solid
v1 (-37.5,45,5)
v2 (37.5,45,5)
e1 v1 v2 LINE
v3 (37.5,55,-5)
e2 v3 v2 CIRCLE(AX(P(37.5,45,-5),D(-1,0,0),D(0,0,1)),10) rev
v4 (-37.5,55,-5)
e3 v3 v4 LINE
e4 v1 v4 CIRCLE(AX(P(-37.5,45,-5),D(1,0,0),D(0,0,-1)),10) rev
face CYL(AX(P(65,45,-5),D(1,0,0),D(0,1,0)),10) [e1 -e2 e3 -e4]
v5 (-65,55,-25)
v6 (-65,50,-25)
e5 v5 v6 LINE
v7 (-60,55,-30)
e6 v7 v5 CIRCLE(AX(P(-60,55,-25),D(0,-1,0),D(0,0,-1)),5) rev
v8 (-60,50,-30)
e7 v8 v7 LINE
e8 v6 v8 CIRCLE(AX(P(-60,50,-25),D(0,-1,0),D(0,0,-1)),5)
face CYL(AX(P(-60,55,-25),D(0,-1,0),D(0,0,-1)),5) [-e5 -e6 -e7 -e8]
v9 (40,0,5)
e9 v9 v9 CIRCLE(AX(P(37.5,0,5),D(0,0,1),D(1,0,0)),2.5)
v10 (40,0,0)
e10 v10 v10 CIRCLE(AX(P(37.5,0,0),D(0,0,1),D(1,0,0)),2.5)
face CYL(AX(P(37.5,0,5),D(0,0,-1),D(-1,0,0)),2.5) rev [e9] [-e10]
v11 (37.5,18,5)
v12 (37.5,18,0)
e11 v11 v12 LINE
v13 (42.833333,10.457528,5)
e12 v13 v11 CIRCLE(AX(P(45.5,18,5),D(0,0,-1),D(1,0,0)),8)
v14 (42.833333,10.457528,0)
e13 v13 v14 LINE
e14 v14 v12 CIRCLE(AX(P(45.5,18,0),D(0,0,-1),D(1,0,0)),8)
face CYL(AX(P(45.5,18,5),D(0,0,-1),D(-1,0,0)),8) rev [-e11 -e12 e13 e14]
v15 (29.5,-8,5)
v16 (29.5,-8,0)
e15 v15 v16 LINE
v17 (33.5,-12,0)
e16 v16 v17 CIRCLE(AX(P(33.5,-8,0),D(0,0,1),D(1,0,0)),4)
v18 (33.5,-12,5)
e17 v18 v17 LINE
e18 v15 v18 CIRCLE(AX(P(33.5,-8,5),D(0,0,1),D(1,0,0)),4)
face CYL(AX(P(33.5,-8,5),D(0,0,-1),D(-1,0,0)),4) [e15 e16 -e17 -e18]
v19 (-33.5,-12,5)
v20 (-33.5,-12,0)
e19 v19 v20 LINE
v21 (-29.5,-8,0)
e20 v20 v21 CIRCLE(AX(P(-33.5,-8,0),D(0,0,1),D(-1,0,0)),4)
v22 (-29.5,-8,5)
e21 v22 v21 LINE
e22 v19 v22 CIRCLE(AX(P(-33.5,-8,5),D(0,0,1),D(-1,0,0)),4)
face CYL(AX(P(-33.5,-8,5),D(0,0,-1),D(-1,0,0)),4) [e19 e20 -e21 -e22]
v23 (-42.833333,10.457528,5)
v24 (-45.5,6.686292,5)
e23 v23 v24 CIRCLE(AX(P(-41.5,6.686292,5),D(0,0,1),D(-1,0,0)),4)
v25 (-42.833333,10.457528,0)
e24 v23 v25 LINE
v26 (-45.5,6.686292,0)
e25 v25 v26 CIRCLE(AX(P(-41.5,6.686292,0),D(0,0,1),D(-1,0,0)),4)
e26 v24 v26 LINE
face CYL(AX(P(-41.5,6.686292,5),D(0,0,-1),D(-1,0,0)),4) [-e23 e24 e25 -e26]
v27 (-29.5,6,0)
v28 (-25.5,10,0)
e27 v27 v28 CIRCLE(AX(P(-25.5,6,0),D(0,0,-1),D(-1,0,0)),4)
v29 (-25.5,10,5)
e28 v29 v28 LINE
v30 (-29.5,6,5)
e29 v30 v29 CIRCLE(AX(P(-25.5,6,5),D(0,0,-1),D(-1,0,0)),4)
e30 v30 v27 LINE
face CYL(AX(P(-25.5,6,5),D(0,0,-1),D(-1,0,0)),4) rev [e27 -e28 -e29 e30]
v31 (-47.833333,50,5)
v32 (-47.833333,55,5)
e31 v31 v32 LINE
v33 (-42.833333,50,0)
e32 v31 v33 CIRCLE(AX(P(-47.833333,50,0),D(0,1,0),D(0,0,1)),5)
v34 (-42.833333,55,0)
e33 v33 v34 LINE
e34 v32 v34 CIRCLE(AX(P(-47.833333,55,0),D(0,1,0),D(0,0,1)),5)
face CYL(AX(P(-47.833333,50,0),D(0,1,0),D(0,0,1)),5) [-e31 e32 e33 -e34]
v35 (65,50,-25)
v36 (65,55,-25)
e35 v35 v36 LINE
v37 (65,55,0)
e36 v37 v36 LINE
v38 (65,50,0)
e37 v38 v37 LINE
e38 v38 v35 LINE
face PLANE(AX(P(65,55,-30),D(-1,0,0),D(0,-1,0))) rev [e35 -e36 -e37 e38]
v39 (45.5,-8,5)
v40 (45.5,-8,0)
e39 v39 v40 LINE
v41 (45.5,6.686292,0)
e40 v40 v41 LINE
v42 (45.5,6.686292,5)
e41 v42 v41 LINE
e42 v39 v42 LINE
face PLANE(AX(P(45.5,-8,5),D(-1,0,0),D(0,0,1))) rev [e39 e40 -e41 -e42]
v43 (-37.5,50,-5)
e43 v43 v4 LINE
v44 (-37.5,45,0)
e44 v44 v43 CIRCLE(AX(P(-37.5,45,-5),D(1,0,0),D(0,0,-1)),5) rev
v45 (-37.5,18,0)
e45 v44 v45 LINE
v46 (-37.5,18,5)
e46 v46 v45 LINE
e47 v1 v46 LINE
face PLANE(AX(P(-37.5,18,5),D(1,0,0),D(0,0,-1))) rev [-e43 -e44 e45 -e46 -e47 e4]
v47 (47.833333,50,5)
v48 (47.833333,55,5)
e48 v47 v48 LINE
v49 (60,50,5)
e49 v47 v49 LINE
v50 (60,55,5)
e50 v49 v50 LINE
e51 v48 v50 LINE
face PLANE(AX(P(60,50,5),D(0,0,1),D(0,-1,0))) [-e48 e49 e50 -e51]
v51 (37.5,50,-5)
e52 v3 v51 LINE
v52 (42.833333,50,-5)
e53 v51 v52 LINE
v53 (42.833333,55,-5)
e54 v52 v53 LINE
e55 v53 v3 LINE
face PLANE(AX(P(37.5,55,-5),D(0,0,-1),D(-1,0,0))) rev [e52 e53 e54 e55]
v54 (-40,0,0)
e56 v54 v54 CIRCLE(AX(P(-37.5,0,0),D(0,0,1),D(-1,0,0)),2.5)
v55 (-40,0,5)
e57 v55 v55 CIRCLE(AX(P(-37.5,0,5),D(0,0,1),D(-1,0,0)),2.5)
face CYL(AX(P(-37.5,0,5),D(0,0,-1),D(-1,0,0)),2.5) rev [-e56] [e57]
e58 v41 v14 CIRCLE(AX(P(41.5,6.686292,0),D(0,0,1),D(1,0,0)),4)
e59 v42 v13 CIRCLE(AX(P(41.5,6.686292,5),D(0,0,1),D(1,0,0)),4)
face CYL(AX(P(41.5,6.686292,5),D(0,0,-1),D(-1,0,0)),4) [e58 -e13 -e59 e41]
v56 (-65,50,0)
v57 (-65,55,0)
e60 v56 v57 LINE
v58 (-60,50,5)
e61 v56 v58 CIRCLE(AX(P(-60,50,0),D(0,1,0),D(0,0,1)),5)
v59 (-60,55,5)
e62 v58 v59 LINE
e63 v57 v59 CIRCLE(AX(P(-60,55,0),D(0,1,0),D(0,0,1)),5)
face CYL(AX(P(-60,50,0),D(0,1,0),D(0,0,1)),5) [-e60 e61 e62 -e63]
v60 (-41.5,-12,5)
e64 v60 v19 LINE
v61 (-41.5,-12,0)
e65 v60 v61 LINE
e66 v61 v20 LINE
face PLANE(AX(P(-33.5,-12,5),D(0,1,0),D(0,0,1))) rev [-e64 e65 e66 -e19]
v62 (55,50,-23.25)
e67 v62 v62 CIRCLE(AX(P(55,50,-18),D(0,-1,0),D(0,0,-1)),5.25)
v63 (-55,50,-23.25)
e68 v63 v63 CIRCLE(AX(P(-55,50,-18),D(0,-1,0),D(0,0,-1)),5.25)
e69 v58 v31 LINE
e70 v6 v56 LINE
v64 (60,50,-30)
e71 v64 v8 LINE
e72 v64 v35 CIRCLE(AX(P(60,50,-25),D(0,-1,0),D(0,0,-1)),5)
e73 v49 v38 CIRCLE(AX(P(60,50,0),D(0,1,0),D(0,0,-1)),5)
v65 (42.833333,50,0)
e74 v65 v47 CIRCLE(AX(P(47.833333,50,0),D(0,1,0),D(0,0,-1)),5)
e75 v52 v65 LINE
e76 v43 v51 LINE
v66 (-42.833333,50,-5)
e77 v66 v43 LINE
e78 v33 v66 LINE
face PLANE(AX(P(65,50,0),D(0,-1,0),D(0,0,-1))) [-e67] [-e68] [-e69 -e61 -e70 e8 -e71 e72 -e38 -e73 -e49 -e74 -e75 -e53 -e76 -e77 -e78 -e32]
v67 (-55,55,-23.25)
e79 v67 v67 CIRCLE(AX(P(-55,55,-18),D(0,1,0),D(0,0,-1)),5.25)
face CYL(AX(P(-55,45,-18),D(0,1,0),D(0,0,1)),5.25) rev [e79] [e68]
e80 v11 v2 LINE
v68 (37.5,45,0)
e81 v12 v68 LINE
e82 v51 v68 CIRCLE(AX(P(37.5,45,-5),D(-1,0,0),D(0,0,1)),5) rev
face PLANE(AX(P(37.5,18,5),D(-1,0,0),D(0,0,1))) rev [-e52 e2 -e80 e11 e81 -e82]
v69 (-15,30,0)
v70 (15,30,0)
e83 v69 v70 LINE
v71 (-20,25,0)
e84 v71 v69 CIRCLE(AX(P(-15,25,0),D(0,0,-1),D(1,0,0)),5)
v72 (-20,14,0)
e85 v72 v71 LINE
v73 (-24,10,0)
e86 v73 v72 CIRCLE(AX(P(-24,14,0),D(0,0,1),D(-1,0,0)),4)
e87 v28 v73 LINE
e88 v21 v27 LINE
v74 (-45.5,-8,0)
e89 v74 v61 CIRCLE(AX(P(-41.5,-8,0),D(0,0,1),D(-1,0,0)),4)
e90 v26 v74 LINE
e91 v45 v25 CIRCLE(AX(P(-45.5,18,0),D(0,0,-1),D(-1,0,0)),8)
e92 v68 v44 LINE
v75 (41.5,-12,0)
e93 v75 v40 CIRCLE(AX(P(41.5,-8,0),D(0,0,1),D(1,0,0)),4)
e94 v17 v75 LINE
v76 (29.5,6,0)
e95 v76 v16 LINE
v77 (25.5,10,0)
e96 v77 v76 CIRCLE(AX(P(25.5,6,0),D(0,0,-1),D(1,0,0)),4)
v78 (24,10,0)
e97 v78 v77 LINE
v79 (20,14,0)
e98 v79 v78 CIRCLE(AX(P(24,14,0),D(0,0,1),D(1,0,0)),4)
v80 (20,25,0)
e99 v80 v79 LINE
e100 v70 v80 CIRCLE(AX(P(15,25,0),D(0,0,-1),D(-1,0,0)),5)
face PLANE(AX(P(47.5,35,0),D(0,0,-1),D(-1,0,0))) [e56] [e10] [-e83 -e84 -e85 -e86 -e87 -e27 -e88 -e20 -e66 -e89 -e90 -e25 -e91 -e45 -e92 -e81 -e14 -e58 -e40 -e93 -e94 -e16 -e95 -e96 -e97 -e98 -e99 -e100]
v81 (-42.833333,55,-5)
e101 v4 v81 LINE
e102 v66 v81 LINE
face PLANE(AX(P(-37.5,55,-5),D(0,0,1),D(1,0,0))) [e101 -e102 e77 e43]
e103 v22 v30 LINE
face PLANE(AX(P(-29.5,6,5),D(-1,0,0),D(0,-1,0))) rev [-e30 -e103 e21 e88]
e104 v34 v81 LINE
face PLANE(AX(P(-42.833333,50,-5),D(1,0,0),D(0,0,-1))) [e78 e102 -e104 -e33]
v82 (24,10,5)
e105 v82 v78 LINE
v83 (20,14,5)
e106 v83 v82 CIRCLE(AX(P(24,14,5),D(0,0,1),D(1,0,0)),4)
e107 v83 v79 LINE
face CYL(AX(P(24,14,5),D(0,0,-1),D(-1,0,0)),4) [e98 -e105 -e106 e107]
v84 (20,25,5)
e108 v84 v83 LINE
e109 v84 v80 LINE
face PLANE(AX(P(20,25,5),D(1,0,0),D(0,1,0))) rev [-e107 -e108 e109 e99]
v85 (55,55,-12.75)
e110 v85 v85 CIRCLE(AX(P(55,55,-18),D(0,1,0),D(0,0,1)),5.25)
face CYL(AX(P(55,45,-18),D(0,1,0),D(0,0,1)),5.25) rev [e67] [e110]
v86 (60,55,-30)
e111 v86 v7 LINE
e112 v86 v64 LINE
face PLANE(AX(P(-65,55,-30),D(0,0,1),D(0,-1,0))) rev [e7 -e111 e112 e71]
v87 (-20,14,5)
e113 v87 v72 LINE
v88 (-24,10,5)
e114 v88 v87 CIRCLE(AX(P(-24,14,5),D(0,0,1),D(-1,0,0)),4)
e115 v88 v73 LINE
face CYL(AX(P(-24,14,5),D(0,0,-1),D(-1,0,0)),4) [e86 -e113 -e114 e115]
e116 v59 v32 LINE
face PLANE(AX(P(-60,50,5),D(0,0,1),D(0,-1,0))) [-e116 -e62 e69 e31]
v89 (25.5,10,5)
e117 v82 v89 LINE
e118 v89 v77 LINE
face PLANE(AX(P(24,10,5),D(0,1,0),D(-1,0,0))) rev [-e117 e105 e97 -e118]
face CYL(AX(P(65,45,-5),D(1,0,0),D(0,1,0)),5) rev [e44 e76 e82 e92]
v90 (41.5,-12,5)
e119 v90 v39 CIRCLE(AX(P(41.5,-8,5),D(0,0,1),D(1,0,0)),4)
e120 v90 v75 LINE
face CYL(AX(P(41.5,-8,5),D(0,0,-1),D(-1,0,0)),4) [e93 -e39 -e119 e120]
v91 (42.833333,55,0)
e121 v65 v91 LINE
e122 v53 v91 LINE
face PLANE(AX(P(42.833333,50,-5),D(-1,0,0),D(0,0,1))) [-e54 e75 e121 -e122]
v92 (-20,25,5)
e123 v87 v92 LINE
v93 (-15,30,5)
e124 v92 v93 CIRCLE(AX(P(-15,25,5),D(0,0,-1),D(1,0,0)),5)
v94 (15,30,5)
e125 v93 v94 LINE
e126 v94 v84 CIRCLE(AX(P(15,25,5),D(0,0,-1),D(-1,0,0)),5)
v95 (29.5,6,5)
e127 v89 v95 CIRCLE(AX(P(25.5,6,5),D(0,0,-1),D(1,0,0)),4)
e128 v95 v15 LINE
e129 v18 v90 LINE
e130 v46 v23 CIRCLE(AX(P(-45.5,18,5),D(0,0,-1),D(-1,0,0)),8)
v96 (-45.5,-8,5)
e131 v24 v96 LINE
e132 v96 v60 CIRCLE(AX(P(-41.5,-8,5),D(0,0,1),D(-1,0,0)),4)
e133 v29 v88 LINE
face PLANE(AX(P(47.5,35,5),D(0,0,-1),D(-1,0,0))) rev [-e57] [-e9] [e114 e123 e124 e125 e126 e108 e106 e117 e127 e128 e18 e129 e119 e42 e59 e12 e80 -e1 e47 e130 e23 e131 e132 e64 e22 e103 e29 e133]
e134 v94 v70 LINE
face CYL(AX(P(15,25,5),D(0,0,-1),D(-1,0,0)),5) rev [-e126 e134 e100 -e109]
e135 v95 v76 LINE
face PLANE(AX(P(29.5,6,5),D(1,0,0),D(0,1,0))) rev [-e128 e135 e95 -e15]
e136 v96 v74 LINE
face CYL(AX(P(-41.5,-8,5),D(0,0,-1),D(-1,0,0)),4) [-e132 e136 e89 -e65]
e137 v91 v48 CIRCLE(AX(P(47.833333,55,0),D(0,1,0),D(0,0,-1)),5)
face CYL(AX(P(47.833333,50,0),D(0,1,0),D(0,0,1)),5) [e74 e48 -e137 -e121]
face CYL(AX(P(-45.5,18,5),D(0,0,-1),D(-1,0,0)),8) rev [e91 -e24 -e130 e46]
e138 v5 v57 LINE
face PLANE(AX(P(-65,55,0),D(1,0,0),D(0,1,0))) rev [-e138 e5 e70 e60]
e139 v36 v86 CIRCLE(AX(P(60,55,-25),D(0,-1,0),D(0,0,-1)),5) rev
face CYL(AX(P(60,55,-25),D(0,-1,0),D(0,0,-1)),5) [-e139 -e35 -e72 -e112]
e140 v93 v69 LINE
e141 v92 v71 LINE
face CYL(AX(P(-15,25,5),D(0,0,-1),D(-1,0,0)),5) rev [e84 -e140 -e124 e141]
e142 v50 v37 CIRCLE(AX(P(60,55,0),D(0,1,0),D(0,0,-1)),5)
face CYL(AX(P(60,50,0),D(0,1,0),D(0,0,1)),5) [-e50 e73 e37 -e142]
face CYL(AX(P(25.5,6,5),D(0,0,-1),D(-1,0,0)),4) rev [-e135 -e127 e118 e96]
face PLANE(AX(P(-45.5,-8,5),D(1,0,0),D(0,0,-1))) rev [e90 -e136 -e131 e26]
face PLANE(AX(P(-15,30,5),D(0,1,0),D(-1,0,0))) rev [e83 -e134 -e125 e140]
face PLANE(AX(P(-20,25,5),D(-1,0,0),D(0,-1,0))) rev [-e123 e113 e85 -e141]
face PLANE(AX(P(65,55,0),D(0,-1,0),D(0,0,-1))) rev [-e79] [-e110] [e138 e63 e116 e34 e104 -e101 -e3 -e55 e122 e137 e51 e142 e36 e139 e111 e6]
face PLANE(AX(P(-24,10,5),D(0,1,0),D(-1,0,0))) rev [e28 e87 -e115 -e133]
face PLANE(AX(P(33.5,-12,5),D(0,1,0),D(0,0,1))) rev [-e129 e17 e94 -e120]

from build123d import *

# Parameters (mm, degrees)
ESQUISSE1_R                           = 2.5
T_LE_DE_BASE_PLI_E1_DEPTH             = 5
T_LE_PLI_E_SUR_AR_TE1_STRIP_W         = 30
T_LE_PLI_E_SUR_AR_TE1_STRIP_H         = 5
T_LE_PLI_E_SUR_AR_TE1_STRIP_CUT_DEPTH = 130
T_LE_PLI_E_SUR_AR_TE1_DEPTH           = 130
CONG_1_R                              = 5
ESQUISSE7_R                           = 5.25
EXTRUSION2_DEPTH                      = 10
ESQUISSE8_W                           = 27.5
ESQUISSE8_H                           = 20
EXTRUSION3_DEPTH                      = 10
PATTE1_DEPTH                          = 5


# Sheet-metal steps are written as plain solids
with BuildPart() as part:
    # Esquisse1 → Tôle de base pliée1 (new body)
    with BuildSketch(Plane.XY):
        with BuildLine():
            Line((29.5, 6), (29.5, -8))
            ThreePointArc((29.5, -8), (30.671572875, -10.828427125), (33.5, -12))
            Line((33.5, -12), (41.5, -12))
            ThreePointArc((41.5, -12), (44.328427125, -10.828427125), (45.5, -8))
            Line((45.5, -8), (45.5, 6.686291501))
            ThreePointArc((45.5, 6.686291501), (44.765986324, 8.995692578), (42.833333333, 10.457527667))
            ThreePointArc((42.833333333, 10.457527667), (38.968027353, 13.381197846), (37.5, 18))
            Line((37.5, 18), (37.5, 35))
            ThreePointArc((37.5, 35), (40.428932188, 42.071067812), (47.5, 45))
            Line((47.5, 45), (65, 45))
            Line((65, 45), (65, 50))
            Line((65, 50), (-65, 50))
            Line((-65, 50), (-65, 45))
            Line((-65, 45), (-47.5, 45))
            ThreePointArc((-47.5, 45), (-40.428932188, 42.071067812), (-37.5, 35))
            Line((-37.5, 35), (-37.5, 18))
            ThreePointArc((-37.5, 18), (-38.968027353, 13.381197846), (-42.833333333, 10.457527667))
            ThreePointArc((-42.833333333, 10.457527667), (-44.765986324, 8.995692578), (-45.5, 6.686291501))
            Line((-45.5, 6.686291501), (-45.5, -8))
            ThreePointArc((-45.5, -8), (-44.328427125, -10.828427125), (-41.5, -12))
            Line((-41.5, -12), (-33.5, -12))
            ThreePointArc((-33.5, -12), (-30.671572875, -10.828427125), (-29.5, -8))
            Line((-29.5, -8), (-29.5, 6))
            ThreePointArc((-29.5, 6), (-28.328427125, 8.828427125), (-25.5, 10))
            Line((-25.5, 10), (-24, 10))
            ThreePointArc((-24, 10), (-21.171572875, 11.171572875), (-20, 14))
            Line((-20, 14), (-20, 25))
            ThreePointArc((-20, 25), (-18.535533906, 28.535533906), (-15, 30))
            Line((-15, 30), (15, 30))
            ThreePointArc((15, 30), (18.535533906, 28.535533906), (20, 25))
            Line((20, 25), (20, 14))
            ThreePointArc((20, 14), (21.171572875, 11.171572875), (24, 10))
            Line((24, 10), (25.5, 10))
            ThreePointArc((25.5, 10), (28.328427125, 8.828427125), (29.5, 6))
        make_face()
        with Locations((37.5, 0)):
            Circle(ESQUISSE1_R, mode=Mode.SUBTRACT)
        with Locations(Location((-37.5, 0, 0), (0, 0, 180))):
            Circle(ESQUISSE1_R, mode=Mode.SUBTRACT)
    extrude(amount=T_LE_DE_BASE_PLI_E1_DEPTH)

    # Tôle pliée sur arête1 strip (across the edge) → Tôle pliée sur arête1 strip cut (cut)
    with BuildSketch(Plane(origin=(-65, 50, 0), x_dir=(0, -1, 0), z_dir=(1, 0, 0))):
        with Locations((-10, -2.5)):
            Rectangle(T_LE_PLI_E_SUR_AR_TE1_STRIP_W, T_LE_PLI_E_SUR_AR_TE1_STRIP_H)
    extrude(amount=T_LE_PLI_E_SUR_AR_TE1_STRIP_CUT_DEPTH, mode=Mode.SUBTRACT)

    # Tôle pliée sur arête1 section (across the edge) → Tôle pliée sur arête1 (add)
    with BuildSketch(Plane(origin=(-65, 50, 0), x_dir=(0, -1, 0), z_dir=(1, 0, 0))):
        with BuildLine():
            Line((-5, 5), (-5, 30))
            Line((-5, 30), (0, 30))
            Line((0, 30), (0, 5))
            ThreePointArc((0, 5), (1.464466094, 1.464466094), (5, 0))
            Line((5, 0), (5, -5))
            ThreePointArc((5, -5), (-2.071067812, -2.071067812), (-5, 5))
        make_face()
    extrude(amount=T_LE_PLI_E_SUR_AR_TE1_DEPTH)

    # Congé1
    cong_1_edges = [part.edges().sort_by_distance(p)[0] for p in [
        (-65, 45, 2.5),
        (65, 45, 2.5),
        (-65, 52.5, -30),
        (65, 52.5, -30),
    ]]
    fillet(cong_1_edges, radius=CONG_1_R - 0.0001)  # a hair under: the kernel refuses the full size

    # Esquisse7 → Extrusion2 (cut)
    with BuildSketch(Plane(origin=(0, 55, 0), x_dir=(1, 0, 0), z_dir=(0, 1, 0))):
        with Locations(Location((55, 18, 0), (0, 0, 270))):
            Circle(ESQUISSE7_R)
        with Locations(Location((-55, 18, 0), (0, 0, 90))):
            Circle(ESQUISSE7_R)
    extrude(amount=-EXTRUSION2_DEPTH, mode=Mode.SUBTRACT)

    # Esquisse8 → Extrusion3 (cut)
    with BuildSketch(Plane.XY.offset(5)):
        with Locations((51.25, 45)):
            Rectangle(ESQUISSE8_W, ESQUISSE8_H)
        with Locations((-51.25, 45)):
            Rectangle(ESQUISSE8_W, ESQUISSE8_H)
    extrude(amount=-EXTRUSION3_DEPTH, mode=Mode.SUBTRACT)

    # Esquisse9 → Patte1 (add)
    with BuildSketch(Plane(origin=(0, 55, 0), x_dir=(1, 0, 0), z_dir=(0, 1, 0))):
        with BuildLine():
            Line((-65, 5), (-42.833333333, 5))
            Line((-42.833333333, 5), (-42.833333333, 0))
            ThreePointArc((-42.833333333, 0), (-44.297799427, -3.535533906), (-47.833333333, -5))
            Line((-47.833333333, -5), (-60, -5))
            ThreePointArc((-60, -5), (-63.535533906, -3.535533906), (-65, 0))
            Line((-65, 0), (-65, 5))
        make_face()
        with BuildLine():
            Line((65, 5), (42.833333333, 5))
            Line((42.833333333, 5), (42.833333333, 0))
            ThreePointArc((42.833333333, 0), (44.297799427, -3.535533906), (47.833333333, -5))
            Line((47.833333333, -5), (60, -5))
            ThreePointArc((60, -5), (63.535533906, -3.535533906), (65, 0))
            Line((65, 0), (65, 5))
        make_face()
    extrude(amount=-PATTE1_DEPTH)


solid = part.part
